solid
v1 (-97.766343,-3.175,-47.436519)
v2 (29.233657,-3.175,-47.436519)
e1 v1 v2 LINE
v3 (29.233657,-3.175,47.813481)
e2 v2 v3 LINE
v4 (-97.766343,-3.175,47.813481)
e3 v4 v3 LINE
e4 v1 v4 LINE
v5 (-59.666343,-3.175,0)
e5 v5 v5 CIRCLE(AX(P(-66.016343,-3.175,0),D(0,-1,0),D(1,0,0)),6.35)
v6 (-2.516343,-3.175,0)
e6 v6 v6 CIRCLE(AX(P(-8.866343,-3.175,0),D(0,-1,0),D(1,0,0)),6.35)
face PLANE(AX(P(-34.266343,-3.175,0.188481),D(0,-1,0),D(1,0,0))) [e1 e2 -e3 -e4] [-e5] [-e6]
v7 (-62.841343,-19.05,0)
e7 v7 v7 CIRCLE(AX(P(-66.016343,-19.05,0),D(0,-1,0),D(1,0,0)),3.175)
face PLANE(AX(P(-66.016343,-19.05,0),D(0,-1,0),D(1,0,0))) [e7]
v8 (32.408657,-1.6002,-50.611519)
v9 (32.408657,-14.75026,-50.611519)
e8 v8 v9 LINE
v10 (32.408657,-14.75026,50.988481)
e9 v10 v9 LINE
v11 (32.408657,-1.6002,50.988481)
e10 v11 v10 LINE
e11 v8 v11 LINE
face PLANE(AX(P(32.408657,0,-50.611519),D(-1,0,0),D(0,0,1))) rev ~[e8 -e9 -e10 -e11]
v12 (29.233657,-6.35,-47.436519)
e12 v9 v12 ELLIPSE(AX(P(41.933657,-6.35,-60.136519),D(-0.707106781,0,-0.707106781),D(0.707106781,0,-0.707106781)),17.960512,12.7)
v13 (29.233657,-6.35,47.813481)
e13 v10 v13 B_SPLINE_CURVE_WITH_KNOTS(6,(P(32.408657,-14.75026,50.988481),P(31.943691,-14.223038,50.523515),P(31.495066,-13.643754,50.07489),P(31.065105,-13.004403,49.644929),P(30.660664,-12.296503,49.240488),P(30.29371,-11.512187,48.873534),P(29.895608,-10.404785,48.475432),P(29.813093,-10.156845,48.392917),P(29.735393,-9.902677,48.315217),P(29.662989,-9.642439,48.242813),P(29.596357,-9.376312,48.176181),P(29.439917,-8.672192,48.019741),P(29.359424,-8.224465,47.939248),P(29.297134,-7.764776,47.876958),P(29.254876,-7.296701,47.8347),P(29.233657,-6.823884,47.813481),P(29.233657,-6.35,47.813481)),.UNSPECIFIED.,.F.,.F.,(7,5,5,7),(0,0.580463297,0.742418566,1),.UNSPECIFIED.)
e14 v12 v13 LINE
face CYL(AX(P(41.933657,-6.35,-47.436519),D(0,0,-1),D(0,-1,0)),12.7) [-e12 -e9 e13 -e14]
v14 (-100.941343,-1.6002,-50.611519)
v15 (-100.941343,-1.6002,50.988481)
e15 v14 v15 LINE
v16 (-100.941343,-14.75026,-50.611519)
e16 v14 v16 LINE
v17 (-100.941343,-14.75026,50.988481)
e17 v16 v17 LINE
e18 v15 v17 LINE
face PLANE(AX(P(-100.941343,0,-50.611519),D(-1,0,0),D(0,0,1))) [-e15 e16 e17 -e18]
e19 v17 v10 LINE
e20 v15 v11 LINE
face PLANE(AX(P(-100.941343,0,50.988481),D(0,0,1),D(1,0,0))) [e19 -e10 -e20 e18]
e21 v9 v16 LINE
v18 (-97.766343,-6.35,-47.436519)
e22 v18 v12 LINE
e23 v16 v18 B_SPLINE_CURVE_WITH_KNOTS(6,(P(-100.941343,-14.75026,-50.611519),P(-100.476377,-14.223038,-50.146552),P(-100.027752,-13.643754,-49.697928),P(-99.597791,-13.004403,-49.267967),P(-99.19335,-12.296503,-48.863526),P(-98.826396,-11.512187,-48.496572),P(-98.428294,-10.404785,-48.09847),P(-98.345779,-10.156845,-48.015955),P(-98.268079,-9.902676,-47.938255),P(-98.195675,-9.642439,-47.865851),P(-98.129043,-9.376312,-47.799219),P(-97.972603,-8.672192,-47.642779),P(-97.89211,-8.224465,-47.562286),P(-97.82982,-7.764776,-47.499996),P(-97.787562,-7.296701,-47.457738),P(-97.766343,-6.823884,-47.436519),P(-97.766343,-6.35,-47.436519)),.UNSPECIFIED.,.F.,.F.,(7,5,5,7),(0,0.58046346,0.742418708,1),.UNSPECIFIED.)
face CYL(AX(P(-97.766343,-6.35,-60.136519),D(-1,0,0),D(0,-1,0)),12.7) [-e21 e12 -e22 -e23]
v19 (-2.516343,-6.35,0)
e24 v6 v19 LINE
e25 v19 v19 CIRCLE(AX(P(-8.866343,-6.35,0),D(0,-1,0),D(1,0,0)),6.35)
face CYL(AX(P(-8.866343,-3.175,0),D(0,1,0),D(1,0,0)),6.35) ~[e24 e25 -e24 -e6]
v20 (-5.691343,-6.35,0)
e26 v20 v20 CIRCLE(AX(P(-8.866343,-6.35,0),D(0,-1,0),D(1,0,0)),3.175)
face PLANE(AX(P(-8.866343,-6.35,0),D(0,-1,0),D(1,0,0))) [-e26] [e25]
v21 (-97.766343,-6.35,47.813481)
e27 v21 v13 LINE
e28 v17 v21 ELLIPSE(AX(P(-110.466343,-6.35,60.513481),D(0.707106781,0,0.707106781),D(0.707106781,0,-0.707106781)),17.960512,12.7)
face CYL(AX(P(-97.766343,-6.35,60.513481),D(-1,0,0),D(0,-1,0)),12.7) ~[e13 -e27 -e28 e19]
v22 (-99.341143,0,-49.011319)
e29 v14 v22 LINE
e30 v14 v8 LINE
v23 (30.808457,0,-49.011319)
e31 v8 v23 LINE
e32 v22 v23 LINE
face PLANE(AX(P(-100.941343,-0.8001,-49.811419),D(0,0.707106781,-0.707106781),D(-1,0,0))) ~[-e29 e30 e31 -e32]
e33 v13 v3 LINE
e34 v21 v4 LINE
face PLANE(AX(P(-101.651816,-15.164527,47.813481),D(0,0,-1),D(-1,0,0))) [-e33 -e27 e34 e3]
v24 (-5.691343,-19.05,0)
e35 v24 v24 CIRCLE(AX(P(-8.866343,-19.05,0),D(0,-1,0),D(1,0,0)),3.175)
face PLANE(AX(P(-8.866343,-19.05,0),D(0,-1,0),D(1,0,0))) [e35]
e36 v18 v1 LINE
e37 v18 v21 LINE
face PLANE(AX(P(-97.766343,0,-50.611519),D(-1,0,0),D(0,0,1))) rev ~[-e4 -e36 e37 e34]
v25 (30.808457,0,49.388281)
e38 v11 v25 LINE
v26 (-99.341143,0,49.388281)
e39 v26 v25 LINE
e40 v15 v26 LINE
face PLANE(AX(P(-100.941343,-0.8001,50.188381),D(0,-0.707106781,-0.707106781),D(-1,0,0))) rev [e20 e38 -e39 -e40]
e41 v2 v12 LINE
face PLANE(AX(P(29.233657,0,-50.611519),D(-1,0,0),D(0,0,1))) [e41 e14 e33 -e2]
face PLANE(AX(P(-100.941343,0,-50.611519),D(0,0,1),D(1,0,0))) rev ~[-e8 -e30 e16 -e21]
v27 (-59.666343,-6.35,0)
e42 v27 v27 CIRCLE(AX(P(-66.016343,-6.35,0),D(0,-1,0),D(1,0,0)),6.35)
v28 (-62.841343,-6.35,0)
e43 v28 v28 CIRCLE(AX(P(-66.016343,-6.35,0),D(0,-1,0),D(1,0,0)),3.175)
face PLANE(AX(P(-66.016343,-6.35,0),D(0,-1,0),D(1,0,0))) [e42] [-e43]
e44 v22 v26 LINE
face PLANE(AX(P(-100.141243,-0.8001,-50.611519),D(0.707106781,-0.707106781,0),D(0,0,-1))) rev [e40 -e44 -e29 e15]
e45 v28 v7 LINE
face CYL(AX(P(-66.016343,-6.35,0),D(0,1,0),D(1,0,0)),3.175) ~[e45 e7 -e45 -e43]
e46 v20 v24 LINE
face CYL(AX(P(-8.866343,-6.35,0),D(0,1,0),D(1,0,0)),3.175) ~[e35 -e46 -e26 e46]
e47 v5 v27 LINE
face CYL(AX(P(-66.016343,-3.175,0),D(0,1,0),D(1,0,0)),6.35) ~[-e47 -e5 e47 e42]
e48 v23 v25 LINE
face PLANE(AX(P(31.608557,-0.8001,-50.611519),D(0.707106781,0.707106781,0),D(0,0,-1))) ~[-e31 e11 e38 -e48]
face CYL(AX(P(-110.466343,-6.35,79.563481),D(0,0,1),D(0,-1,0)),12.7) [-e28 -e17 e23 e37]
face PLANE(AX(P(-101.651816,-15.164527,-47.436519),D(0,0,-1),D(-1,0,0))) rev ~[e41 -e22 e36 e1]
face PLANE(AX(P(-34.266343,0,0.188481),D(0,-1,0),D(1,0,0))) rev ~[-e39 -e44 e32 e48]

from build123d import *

# Parameters (mm, degrees)
F0_W         = 133.35
F0_H         = 101.6
F1_DEPTH     = 19.05
F2_T         = -3.175
F3_R         = 6.35
F4_DEPTH     = 3.175
F5_R         = 3.175
F6_DEPTH     = 12.7
F7_R         = 3.175
F8_DEPTH     = 12.7
F9_T1_DEPTH  = 95.25
F9_T3_DEPTH  = 127
F9_T9_DEPTH  = 158.75
F9_T15_DEPTH = 127
F9_T24_DEPTH = 158.75
F9_T30_DEPTH = 127
F9_T39_DEPTH = 127
F9_T45_DEPTH = 158.75
F9_T54_DEPTH = 158.75
F9_T60_DEPTH = 127
F10_SIZE     = 1.6002


# Not quite as in the source:
# - a fillet or chamfer that OpenCascade refuses, or shapes differently, is made with other operations: its cross-section is extruded or revolved along the edge and cut away or added


with BuildPart() as f1:
    # F0 (on Front) → F1 (new body)
    with BuildSketch(Plane.XZ):
        with Locations((-34.2663429767, 0.1884810627)):
            Rectangle(F0_W, F0_H)
    extrude(amount=F1_DEPTH)

    # F2
    f2_openings = [f1.faces().sort_by_distance(p)[0] for p in [
        (-34.266343, -19.05, 0.188481),
    ]]
    offset(amount=F2_T, openings=f2_openings)

    # F3 (on face) → F4 (join)
    with BuildSketch(Plane.XZ.offset(3.175)):
        with Locations((-66.0163429767, 0)):
            Circle(F3_R)
        with Locations((-8.8663429767, 0)):
            Circle(F3_R)
    extrude(amount=F4_DEPTH)

    # F5 (on face) → F6 (join)
    with BuildSketch(Plane.XZ.offset(6.35)):
        with Locations((-66.0163429767, 0)):
            Circle(F5_R)
    extrude(amount=F6_DEPTH)

    # F7 (on face) → F8 (join)
    with BuildSketch(Plane.XZ.offset(6.35)):
        with Locations((-8.8663429767, 0)):
            Circle(F7_R)
    extrude(amount=F8_DEPTH)

    # F9: fillet of radius 12.7 on 4 edges, made by hand

    # F9_s2 → F9_t1 (cut)
    with BuildSketch(Plane.XY.offset(-47.4365189373)):
        with BuildLine():
            ThreePointArc((-110.4663429767, -19.05), (-101.4860868556, -15.3302561211), (-97.7663429767, -6.35))
            Line((-97.7663429767, -6.35), (-97.7663429767, -19.05))
            Line((-97.7663429767, -19.05), (-110.4663429767, -19.05))
        make_face()
        with BuildLine():
            ThreePointArc((41.9336570233, -19.05), (32.9534009023, -15.3302561211), (29.2336570233, -6.35))
            Line((29.2336570233, -6.35), (29.2336570233, -19.05))
            Line((29.2336570233, -19.05), (41.9336570233, -19.05))
        make_face()
    extrude(amount=F9_T1_DEPTH, mode=Mode.SUBTRACT)

    # F9_s4 → F9_t3 (cut)
    with BuildSketch(Plane.YZ.offset(-97.7663429767)):
        with BuildLine():
            ThreePointArc((-19.05, -60.1365189373), (-15.3302561211, -51.1562628163), (-6.35, -47.4365189373))
            Line((-6.35, -47.4365189373), (-19.05, -47.4365189373))
            Line((-19.05, -47.4365189373), (-19.05, -60.1365189373))
        make_face()
        with BuildLine():
            ThreePointArc((-19.05, 60.5134810627), (-15.3302561211, 51.5332249416), (-6.35, 47.8134810627))
            Line((-6.35, 47.8134810627), (-19.05, 47.8134810627))
            Line((-19.05, 47.8134810627), (-19.05, 60.5134810627))
        make_face()
    extrude(amount=F9_T3_DEPTH, mode=Mode.SUBTRACT)


with BuildPart() as f9_tool7:
    # F9_s8 → F9_t9 (new body)
    with BuildSketch(Plane.YZ.offset(29.2336570233)):
        with BuildLine():
            ThreePointArc((-19.05, 60.5134810627), (-15.3302561211, 51.5332249416), (-6.35, 47.8134810627))
            Line((-6.35, 47.8134810627), (-19.05, 47.8134810627))
            Line((-19.05, 47.8134810627), (-19.05, 60.5134810627))
        make_face()
    extrude(amount=-F9_T9_DEPTH)

    split(bisect_by=Plane.XY.offset(50.9884810627), keep=Keep.BOTTOM)

    split(bisect_by=Plane.YZ.offset(-100.9413429767), keep=Keep.TOP)

    split(bisect_by=Plane.YZ.offset(-97.7663429767), keep=Keep.BOTTOM)


with BuildPart() as f9_tool13:
    # F9_s14 → F9_t15 (new body)
    with BuildSketch(Plane.XY.offset(79.5634810627)):
        with BuildLine():
            ThreePointArc((-110.4663429767, -19.05), (-101.4860868556, -15.3302561211), (-97.7663429767, -6.35))
            Line((-97.7663429767, -6.35), (-97.7663429767, -19.05))
            Line((-97.7663429767, -19.05), (-110.4663429767, -19.05))
        make_face()
    extrude(amount=-F9_T15_DEPTH)

    split(bisect_by=Plane.XY.offset(50.9884810627), keep=Keep.BOTTOM)

    split(bisect_by=Plane.YZ.offset(-100.9413429767), keep=Keep.TOP)

    split(bisect_by=Plane.XY.offset(47.8134810627), keep=Keep.TOP)


with BuildPart() as f9_tool7_1:
    add(f9_tool7.part)

    # F9_t19: intersect F9_tool13
    add(f9_tool13.part, mode=Mode.INTERSECT)


with BuildPart() as f1_1:
    add(f1.part)

    # F9_t5: cut F9_tool7
    add(f9_tool7_1.part, mode=Mode.SUBTRACT)


with BuildPart() as f9_tool22:
    # F9_s23 → F9_t24 (new body)
    with BuildSketch(Plane.YZ.offset(-129.5163429767)):
        with BuildLine():
            ThreePointArc((-19.05, -60.1365189373), (-15.3302561211, -51.1562628163), (-6.35, -47.4365189373))
            Line((-6.35, -47.4365189373), (-19.05, -47.4365189373))
            Line((-19.05, -47.4365189373), (-19.05, -60.1365189373))
        make_face()
    extrude(amount=F9_T24_DEPTH)

    split(bisect_by=Plane.YZ.offset(-100.9413429767), keep=Keep.TOP)

    split(bisect_by=Plane.XY.offset(-50.6115189373), keep=Keep.TOP)

    split(bisect_by=Plane.YZ.offset(-97.7663429767), keep=Keep.BOTTOM)


with BuildPart() as f9_tool28:
    # F9_s29 → F9_t30 (new body)
    with BuildSketch(Plane.XY.offset(47.8134810627)):
        with BuildLine():
            ThreePointArc((-110.4663429767, -19.05), (-101.4860868556, -15.3302561211), (-97.7663429767, -6.35))
            Line((-97.7663429767, -6.35), (-97.7663429767, -19.05))
            Line((-97.7663429767, -19.05), (-110.4663429767, -19.05))
        make_face()
    extrude(amount=-F9_T30_DEPTH)

    split(bisect_by=Plane.YZ.offset(-100.9413429767), keep=Keep.TOP)

    split(bisect_by=Plane.XY.offset(-50.6115189373), keep=Keep.TOP)

    split(bisect_by=Plane.XY.offset(-47.4365189373), keep=Keep.BOTTOM)


with BuildPart() as f9_tool22_1:
    add(f9_tool22.part)

    # F9_t34: intersect F9_tool28
    add(f9_tool28.part, mode=Mode.INTERSECT)


with BuildPart() as f1_2:
    add(f1_1.part)

    # F9_t20: cut F9_tool22
    add(f9_tool22_1.part, mode=Mode.SUBTRACT)


with BuildPart() as f9_tool37:
    # F9_s38 → F9_t39 (new body)
    with BuildSketch(Plane.XY.offset(-79.1865189373)):
        with BuildLine():
            ThreePointArc((41.9336570233, -19.05), (32.9534009023, -15.3302561211), (29.2336570233, -6.35))
            Line((29.2336570233, -6.35), (29.2336570233, -19.05))
            Line((29.2336570233, -19.05), (41.9336570233, -19.05))
        make_face()
    extrude(amount=F9_T39_DEPTH)

    split(bisect_by=Plane.YZ.offset(32.4086570233), keep=Keep.BOTTOM)

    split(bisect_by=Plane.XY.offset(-50.6115189373), keep=Keep.TOP)

    split(bisect_by=Plane.XY.offset(-47.4365189373), keep=Keep.BOTTOM)


with BuildPart() as f9_tool43:
    # F9_s44 → F9_t45 (new body)
    with BuildSketch(Plane.YZ.offset(-97.7663429767)):
        with BuildLine():
            ThreePointArc((-19.05, -60.1365189373), (-15.3302561211, -51.1562628163), (-6.35, -47.4365189373))
            Line((-6.35, -47.4365189373), (-19.05, -47.4365189373))
            Line((-19.05, -47.4365189373), (-19.05, -60.1365189373))
        make_face()
    extrude(amount=F9_T45_DEPTH)

    split(bisect_by=Plane.YZ.offset(32.4086570233), keep=Keep.BOTTOM)

    split(bisect_by=Plane.XY.offset(-50.6115189373), keep=Keep.TOP)

    split(bisect_by=Plane.YZ.offset(29.2336570233), keep=Keep.TOP)


with BuildPart() as f9_tool37_1:
    add(f9_tool37.part)

    # F9_t49: intersect F9_tool43
    add(f9_tool43.part, mode=Mode.INTERSECT)


with BuildPart() as f1_3:
    add(f1_2.part)

    # F9_t35: cut F9_tool37
    add(f9_tool37_1.part, mode=Mode.SUBTRACT)


with BuildPart() as f9_tool52:
    # F9_s53 → F9_t54 (new body)
    with BuildSketch(Plane.YZ.offset(60.9836570233)):
        with BuildLine():
            ThreePointArc((-19.05, 60.5134810627), (-15.3302561211, 51.5332249416), (-6.35, 47.8134810627))
            Line((-6.35, 47.8134810627), (-19.05, 47.8134810627))
            Line((-19.05, 47.8134810627), (-19.05, 60.5134810627))
        make_face()
    extrude(amount=-F9_T54_DEPTH)

    split(bisect_by=Plane.XY.offset(50.9884810627), keep=Keep.BOTTOM)

    split(bisect_by=Plane.YZ.offset(32.4086570233), keep=Keep.BOTTOM)

    split(bisect_by=Plane.YZ.offset(29.2336570233), keep=Keep.TOP)


with BuildPart() as f9_tool58:
    # F9_s59 → F9_t60 (new body)
    with BuildSketch(Plane.XY.offset(-47.4365189373)):
        with BuildLine():
            ThreePointArc((41.9336570233, -19.05), (32.9534009023, -15.3302561211), (29.2336570233, -6.35))
            Line((29.2336570233, -6.35), (29.2336570233, -19.05))
            Line((29.2336570233, -19.05), (41.9336570233, -19.05))
        make_face()
    extrude(amount=F9_T60_DEPTH)

    split(bisect_by=Plane.XY.offset(50.9884810627), keep=Keep.BOTTOM)

    split(bisect_by=Plane.YZ.offset(32.4086570233), keep=Keep.BOTTOM)

    split(bisect_by=Plane.XY.offset(47.8134810627), keep=Keep.TOP)


with BuildPart() as f9_tool52_1:
    add(f9_tool52.part)

    # F9_t64: intersect F9_tool58
    add(f9_tool58.part, mode=Mode.INTERSECT)


with BuildPart() as f1_4:
    add(f1_3.part)

    # F9_t50: cut F9_tool52
    add(f9_tool52_1.part, mode=Mode.SUBTRACT)

    # F10
    f10_edges = [f1_4.edges().sort_by_distance(p)[0] for p in [
        (-34.266343, 0, 50.988481),
        (-100.941343, 0, 0.188481),
        (-34.266343, 0, -50.611519),
        (32.408657, 0, 0.188481),
    ]]
    chamfer(f10_edges, length=F10_SIZE)


solid = f1_4.part
